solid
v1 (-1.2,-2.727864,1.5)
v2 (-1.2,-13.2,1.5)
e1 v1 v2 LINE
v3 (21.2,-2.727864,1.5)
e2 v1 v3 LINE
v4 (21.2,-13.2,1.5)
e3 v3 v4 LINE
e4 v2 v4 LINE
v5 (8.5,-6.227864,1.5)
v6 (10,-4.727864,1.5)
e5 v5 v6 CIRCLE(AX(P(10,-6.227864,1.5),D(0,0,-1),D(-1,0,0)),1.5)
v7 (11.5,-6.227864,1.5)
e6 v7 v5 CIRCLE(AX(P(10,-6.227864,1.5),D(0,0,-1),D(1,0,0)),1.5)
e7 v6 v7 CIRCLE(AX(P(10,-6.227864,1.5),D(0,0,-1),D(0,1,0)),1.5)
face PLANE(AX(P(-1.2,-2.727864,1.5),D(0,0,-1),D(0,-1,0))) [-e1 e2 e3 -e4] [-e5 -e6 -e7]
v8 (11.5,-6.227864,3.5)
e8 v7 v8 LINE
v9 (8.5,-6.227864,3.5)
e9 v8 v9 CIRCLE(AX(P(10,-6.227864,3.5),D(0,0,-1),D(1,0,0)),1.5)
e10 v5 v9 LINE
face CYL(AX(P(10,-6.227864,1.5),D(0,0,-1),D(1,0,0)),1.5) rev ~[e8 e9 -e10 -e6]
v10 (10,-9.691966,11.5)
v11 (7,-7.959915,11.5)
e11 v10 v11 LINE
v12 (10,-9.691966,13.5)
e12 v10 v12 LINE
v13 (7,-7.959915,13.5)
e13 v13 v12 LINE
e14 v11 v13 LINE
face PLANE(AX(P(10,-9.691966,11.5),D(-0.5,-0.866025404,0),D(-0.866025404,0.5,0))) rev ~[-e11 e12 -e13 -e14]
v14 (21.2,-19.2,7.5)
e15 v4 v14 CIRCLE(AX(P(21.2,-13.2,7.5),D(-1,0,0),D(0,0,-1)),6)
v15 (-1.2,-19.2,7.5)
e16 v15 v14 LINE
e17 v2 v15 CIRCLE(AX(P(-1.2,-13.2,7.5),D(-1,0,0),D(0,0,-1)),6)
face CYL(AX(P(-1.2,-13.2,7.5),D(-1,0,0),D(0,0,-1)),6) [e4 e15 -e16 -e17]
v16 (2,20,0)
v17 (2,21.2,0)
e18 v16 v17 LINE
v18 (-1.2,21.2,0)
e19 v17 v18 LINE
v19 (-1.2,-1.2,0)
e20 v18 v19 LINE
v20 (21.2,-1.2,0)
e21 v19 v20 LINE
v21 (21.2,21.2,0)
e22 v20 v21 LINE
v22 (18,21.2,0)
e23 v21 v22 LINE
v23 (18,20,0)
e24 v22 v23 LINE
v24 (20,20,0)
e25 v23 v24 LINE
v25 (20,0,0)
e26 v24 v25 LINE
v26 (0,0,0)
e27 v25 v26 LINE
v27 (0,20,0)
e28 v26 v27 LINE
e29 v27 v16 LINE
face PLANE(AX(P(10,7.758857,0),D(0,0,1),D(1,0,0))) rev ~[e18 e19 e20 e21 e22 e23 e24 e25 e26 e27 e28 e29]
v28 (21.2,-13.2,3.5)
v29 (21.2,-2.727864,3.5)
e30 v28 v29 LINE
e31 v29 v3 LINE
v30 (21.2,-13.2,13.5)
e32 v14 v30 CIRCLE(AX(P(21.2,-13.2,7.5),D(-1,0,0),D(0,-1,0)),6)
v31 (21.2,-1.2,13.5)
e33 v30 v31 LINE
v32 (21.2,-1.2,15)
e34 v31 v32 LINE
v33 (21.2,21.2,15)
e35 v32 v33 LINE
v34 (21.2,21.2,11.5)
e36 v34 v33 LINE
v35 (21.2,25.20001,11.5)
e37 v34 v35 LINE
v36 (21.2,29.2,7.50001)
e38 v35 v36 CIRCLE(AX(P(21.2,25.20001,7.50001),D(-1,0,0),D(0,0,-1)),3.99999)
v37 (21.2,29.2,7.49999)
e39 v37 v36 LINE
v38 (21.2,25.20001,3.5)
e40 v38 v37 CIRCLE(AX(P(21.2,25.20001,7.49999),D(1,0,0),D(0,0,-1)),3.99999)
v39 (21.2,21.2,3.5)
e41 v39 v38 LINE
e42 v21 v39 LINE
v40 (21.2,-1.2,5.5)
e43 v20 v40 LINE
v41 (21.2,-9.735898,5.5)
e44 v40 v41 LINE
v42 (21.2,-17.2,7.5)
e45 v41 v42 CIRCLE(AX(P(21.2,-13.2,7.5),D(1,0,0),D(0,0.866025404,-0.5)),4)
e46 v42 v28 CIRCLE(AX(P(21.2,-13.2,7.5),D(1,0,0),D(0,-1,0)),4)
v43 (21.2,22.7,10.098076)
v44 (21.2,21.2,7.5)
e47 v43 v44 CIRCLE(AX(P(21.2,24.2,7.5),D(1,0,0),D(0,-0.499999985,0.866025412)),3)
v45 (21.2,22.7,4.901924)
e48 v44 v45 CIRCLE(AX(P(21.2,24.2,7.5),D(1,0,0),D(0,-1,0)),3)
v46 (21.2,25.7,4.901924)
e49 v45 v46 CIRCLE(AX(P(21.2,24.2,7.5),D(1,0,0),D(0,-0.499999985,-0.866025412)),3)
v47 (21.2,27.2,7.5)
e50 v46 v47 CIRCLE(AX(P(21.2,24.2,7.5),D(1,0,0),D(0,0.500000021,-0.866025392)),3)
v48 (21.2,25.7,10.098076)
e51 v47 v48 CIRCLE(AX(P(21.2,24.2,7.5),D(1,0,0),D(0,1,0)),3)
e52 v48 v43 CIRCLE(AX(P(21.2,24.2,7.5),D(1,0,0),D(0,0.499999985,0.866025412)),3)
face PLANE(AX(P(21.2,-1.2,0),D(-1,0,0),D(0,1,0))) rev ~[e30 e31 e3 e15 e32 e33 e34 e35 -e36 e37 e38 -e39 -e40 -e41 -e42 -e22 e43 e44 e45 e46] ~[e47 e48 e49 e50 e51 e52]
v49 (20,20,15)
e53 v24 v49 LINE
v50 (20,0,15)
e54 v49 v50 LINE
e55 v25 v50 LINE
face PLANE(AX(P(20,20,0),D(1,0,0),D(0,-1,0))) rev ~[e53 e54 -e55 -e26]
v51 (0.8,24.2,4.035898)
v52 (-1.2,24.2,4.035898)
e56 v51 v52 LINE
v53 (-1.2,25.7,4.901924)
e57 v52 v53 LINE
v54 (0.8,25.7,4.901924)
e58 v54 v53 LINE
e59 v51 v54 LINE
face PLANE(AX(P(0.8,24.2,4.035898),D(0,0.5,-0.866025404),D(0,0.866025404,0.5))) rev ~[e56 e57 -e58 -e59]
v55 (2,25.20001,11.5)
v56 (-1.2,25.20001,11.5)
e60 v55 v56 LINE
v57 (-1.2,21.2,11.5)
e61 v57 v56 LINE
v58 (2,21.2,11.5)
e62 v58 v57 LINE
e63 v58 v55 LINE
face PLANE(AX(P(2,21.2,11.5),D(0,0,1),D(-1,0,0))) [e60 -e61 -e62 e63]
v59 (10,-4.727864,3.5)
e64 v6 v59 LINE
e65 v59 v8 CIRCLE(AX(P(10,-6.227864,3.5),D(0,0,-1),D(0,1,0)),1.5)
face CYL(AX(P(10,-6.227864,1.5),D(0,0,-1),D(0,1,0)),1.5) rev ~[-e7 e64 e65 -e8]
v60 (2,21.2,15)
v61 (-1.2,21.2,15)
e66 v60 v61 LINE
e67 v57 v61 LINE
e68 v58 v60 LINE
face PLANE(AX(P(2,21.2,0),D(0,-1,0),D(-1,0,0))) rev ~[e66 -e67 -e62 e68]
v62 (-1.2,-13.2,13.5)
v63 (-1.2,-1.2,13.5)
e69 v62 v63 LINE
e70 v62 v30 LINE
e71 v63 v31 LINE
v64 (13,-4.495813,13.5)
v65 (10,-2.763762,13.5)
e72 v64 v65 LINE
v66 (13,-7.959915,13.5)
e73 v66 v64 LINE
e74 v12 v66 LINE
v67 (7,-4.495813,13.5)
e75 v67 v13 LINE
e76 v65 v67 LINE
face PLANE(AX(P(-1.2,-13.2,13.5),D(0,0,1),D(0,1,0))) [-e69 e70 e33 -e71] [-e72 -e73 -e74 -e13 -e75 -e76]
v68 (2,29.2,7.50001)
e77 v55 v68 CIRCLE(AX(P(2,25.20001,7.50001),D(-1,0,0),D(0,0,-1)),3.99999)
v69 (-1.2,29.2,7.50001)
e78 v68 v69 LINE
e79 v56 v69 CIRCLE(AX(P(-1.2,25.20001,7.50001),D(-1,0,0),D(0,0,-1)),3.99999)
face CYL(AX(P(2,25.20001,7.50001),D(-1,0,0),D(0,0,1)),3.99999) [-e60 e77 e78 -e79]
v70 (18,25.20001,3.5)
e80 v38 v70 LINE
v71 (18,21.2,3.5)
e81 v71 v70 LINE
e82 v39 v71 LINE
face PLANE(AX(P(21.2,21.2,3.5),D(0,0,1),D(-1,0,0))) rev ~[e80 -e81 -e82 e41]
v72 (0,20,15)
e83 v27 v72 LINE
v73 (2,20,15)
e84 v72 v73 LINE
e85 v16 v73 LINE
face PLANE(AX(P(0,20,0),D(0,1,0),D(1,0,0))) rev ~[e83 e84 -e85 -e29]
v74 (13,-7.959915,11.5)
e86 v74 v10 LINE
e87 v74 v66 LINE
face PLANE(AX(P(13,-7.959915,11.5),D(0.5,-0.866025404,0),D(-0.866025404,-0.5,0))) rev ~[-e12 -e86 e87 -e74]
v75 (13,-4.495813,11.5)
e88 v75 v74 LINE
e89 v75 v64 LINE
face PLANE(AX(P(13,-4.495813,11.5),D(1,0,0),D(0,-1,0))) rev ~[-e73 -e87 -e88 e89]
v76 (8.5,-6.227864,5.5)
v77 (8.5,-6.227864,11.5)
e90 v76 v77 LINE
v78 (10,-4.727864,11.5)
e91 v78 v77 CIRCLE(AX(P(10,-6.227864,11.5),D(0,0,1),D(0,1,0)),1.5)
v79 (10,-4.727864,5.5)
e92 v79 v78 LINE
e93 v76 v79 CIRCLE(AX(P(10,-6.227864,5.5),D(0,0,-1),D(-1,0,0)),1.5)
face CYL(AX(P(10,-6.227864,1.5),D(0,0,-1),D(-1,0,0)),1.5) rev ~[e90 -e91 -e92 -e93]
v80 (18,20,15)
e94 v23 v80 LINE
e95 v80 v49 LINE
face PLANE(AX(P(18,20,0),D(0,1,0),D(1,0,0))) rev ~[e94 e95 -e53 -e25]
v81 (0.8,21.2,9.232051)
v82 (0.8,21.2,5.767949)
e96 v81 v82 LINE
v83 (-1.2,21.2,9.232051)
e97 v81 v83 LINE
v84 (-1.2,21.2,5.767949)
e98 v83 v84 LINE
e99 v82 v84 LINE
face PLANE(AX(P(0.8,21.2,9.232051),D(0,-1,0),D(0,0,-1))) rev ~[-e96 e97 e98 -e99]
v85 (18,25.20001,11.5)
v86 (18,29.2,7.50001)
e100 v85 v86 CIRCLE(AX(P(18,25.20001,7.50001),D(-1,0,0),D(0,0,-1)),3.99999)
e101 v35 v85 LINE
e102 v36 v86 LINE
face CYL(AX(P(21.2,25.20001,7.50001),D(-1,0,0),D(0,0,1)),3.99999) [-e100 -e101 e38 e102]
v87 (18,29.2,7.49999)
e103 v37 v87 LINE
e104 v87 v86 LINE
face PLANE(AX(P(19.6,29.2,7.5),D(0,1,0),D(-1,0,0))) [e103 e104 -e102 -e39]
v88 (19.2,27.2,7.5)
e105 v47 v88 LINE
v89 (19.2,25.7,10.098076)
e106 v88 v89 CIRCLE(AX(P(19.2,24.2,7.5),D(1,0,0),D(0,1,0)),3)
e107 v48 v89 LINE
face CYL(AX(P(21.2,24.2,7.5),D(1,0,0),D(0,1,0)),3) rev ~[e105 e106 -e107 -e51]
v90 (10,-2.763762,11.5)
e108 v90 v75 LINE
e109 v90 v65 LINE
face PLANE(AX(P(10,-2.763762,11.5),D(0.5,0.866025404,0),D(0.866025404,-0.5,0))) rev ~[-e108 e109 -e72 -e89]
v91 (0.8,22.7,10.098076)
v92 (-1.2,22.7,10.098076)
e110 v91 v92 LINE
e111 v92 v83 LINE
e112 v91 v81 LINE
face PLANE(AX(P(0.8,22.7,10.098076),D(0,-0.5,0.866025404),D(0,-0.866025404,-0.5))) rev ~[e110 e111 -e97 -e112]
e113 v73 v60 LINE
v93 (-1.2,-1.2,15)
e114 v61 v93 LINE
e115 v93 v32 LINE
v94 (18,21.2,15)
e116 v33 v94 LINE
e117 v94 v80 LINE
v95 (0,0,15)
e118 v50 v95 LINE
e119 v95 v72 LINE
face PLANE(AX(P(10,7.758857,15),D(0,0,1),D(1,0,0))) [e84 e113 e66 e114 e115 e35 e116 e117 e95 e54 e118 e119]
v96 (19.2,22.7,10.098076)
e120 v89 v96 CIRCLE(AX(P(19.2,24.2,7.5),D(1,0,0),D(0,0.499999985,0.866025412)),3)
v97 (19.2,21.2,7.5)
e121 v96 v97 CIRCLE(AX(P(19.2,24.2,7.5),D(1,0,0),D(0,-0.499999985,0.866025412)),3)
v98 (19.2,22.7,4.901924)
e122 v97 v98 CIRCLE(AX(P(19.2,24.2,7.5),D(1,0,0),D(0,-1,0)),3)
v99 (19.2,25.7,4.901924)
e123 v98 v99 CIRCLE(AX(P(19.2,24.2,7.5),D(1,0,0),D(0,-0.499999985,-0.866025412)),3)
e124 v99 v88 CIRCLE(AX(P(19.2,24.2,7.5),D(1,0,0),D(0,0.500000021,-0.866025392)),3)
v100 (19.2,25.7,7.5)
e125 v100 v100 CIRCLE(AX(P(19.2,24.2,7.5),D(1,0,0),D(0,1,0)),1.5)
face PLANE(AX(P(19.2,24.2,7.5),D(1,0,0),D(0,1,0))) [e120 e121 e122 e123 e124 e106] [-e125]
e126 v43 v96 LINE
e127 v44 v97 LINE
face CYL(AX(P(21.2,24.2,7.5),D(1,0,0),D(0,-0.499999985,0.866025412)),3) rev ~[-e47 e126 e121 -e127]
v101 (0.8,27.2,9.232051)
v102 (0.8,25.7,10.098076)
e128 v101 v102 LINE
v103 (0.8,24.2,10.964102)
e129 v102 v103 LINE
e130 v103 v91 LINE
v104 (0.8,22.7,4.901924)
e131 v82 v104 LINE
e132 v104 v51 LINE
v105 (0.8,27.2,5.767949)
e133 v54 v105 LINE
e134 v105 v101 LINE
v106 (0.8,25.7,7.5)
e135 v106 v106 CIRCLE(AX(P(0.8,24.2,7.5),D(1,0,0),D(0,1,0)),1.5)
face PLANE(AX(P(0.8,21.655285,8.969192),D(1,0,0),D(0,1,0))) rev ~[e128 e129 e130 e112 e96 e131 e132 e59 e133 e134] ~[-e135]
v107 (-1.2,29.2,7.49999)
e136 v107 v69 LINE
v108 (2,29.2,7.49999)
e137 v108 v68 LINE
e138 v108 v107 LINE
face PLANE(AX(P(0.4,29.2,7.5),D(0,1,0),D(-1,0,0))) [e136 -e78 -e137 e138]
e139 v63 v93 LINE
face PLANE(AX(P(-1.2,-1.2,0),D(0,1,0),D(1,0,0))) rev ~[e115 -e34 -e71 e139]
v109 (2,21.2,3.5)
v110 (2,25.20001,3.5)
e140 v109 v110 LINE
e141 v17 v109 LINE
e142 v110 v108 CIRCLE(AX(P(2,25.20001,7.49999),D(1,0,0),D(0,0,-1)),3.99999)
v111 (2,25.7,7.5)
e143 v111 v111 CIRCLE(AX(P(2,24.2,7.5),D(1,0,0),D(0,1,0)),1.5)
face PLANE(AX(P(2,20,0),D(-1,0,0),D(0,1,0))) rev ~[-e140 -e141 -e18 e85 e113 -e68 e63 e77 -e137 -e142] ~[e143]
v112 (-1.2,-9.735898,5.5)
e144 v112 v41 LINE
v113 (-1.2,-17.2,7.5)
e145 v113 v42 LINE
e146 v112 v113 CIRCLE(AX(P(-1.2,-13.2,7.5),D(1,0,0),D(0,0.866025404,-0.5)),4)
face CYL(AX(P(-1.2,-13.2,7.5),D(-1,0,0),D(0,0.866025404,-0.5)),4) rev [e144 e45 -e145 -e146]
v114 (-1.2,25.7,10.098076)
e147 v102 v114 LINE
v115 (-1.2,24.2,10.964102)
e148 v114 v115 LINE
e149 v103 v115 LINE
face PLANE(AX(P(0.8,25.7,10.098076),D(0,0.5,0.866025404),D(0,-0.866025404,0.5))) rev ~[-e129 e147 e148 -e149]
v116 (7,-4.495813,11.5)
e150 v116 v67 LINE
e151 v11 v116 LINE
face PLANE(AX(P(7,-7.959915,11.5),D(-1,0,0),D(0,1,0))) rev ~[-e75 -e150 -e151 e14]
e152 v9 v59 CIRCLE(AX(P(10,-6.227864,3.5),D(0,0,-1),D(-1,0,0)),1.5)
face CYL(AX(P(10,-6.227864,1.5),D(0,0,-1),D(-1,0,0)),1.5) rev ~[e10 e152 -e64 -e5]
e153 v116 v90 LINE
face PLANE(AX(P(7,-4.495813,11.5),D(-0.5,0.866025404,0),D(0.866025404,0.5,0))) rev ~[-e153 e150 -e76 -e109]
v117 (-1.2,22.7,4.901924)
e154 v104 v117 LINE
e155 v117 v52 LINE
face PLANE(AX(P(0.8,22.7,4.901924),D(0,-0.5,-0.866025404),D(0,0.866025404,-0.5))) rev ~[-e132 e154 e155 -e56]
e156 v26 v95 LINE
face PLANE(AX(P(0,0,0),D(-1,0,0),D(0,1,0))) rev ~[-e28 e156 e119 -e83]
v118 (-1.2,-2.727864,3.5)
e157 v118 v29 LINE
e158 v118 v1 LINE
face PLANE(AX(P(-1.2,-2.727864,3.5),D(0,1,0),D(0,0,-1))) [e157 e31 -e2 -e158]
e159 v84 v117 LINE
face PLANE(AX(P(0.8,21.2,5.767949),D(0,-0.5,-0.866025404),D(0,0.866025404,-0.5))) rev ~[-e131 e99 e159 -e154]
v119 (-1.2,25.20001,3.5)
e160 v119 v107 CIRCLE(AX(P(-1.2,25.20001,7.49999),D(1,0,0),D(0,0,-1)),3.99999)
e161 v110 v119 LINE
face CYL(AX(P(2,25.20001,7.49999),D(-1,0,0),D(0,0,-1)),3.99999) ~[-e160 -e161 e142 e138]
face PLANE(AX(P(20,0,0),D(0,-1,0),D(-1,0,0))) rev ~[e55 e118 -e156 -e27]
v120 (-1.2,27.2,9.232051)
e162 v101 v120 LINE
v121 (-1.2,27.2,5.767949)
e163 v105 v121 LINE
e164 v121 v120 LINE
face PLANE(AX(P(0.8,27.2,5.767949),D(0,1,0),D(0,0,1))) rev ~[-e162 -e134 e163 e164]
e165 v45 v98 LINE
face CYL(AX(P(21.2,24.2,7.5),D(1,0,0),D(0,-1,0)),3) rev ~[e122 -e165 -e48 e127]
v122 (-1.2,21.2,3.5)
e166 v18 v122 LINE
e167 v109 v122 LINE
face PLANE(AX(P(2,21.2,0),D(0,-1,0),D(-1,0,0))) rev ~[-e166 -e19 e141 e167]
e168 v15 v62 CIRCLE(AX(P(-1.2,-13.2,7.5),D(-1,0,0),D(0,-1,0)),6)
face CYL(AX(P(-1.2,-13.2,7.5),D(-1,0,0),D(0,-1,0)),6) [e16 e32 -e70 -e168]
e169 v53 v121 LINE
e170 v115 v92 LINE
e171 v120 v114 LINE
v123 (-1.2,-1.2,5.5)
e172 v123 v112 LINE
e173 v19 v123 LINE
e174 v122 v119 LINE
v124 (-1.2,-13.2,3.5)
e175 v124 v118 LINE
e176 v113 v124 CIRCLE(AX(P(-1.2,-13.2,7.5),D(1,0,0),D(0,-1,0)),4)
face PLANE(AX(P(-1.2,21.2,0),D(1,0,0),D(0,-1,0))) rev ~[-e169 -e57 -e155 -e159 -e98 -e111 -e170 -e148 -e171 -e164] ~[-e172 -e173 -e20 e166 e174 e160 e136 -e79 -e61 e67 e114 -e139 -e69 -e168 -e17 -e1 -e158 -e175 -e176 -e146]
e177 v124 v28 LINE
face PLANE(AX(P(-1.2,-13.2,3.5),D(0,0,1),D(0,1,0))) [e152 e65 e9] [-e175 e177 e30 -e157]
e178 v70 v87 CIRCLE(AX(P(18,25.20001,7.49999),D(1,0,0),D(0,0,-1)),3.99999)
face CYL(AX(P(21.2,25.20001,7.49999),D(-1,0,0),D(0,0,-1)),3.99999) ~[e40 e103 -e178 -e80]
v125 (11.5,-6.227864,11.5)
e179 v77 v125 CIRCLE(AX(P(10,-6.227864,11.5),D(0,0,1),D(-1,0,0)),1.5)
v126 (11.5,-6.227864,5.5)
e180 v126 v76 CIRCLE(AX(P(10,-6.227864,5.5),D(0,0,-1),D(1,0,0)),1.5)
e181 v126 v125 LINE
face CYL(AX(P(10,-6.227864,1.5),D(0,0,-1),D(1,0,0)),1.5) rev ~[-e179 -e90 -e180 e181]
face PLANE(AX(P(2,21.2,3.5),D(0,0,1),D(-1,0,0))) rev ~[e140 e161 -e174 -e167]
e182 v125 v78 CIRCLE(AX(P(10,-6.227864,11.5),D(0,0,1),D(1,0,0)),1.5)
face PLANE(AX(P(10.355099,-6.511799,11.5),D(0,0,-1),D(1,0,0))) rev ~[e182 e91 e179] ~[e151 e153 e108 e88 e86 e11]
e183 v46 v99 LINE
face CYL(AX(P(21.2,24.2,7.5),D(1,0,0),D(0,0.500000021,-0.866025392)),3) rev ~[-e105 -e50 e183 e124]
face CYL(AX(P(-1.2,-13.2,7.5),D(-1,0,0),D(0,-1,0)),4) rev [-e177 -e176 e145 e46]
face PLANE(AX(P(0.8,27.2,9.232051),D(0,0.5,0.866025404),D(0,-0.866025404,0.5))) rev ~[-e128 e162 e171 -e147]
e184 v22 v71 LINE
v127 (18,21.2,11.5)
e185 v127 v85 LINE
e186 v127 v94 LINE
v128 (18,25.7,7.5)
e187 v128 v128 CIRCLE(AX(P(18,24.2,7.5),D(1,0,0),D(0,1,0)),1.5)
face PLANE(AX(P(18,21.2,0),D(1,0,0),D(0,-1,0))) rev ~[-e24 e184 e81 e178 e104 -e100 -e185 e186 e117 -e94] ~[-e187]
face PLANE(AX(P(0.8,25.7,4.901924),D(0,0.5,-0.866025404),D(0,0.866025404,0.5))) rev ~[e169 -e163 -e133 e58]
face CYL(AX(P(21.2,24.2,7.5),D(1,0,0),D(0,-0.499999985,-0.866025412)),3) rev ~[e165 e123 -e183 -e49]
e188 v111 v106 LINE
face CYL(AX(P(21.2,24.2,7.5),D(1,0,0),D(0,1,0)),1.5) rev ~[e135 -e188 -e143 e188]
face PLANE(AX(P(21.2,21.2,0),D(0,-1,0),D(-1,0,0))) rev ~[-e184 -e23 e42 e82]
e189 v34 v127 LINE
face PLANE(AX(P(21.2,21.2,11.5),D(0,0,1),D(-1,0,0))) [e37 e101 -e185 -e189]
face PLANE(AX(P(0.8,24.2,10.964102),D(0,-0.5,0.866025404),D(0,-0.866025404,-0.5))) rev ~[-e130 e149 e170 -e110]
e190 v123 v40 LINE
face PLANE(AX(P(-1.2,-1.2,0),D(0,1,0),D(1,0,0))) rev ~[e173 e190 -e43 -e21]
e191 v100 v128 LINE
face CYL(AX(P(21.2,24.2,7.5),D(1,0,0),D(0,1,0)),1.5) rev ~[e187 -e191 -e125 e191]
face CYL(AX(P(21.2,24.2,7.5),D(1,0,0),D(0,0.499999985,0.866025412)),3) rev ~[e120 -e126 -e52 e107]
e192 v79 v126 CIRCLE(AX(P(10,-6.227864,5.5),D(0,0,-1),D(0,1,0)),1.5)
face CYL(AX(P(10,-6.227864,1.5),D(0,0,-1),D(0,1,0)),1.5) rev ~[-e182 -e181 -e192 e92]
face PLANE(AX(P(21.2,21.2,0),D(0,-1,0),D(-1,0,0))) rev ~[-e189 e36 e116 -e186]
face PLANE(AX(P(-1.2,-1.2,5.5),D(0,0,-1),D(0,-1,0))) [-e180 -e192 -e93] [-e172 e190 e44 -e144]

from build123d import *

# Parameters (mm, degrees)
F1_DEPTH  = 15
F3_DEPTH  = 22.4
F5_DEPTH  = 25
F6_START  = -10
F6_DEPTH  = 15
F7_W      = 3.2
F7_H      = 8
F8_DEPTH  = 8
F9_R      = 3.99999
F10_R     = 1.5
F11_DEPTH = 25
F12_DEPTH = 2
F13_START = -20.4
F13_DEPTH = 4.6


# Not quite as in the source:
# - a fillet or chamfer is up to 0.001 mm smaller than in the source, because OpenCascade refuses the exact size


with BuildPart() as f1:
    # F0 (on Top) → F1 (new body)
    with BuildSketch(Plane.XY):
        Polygon((20, 0), (0, 0), (0, 20), (2, 20), (2, 21.2), (-1.2, 21.2), (-1.2, -1.2), (21.2, -1.2), (21.2, 21.2), (18, 21.2), (18, 20), (20, 20), align=None)
    extrude(amount=F1_DEPTH)

    # F2 (on face) → F3 (join)
    with BuildSketch(Plane(origin=(-1.2, 0, 0), x_dir=(0, -1, 0), z_dir=(-1, 0, 0))):
        with BuildLine():
            Line((1.2, 5.5), (7.5431457505, 5.5))
            ThreePointArc((7.5431457505, 5.5), (8.3010205144, 10.9641016151), (13.2, 13.5))
            Line((13.2, 13.5), (1.2, 13.5))
            Line((1.2, 13.5), (1.2, 5.5))
        make_face()
        with BuildLine():
            ThreePointArc((17.2, 7.5), (16.0284271247, 4.6715728753), (13.2, 3.5))
            Line((13.2, 3.5), (8.727864045, 3.5))
            ThreePointArc((8.727864045, 3.5), (10.7505102572, 2.0227744249), (13.2, 1.5))
            ThreePointArc((13.2, 1.5), (17.4426406871, 3.2573593129), (19.2, 7.5))
            ThreePointArc((19.2, 7.5), (17.4426406871, 11.7426406871), (13.2, 13.5))
            ThreePointArc((13.2, 13.5), (8.3010205144, 10.9641016151), (7.5431457505, 5.5))
            Line((7.5431457505, 5.5), (9.7358983849, 5.5))
            ThreePointArc((9.7358983849, 5.5), (12.1647238196, 11.3637033052), (17.2, 7.5))
        make_face()
        with BuildLine():
            ThreePointArc((13.2, 1.5), (10.7505102572, 2.0227744249), (8.727864045, 3.5))
            Line((8.727864045, 3.5), (2.727864045, 3.5))
            Line((2.727864045, 3.5), (2.727864045, 1.5))
            Line((2.727864045, 1.5), (13.2, 1.5))
        make_face()
    extrude(amount=-F3_DEPTH)

    # F4 (on face) → F5 (cut)
    with BuildSketch(Plane(origin=(0, 0, 1.5), x_dir=(1, 0, 0), z_dir=(0, 0, -1))):
        with BuildLine():
            ThreePointArc((8.5, 6.227864045), (8.9393398282, 5.1672038732), (10, 4.727864045))
            Line((10, 4.727864045), (10, 6.227864045))
            Line((10, 6.227864045), (8.5, 6.227864045))
        make_face()
        with BuildLine():
            Line((10, 6.227864045), (10, 4.727864045))
            ThreePointArc((10, 4.727864045), (11.0606601718, 5.1672038732), (11.5, 6.227864045))
            ThreePointArc((11.5, 6.227864045), (10, 7.727864045), (8.5, 6.227864045))
            Line((8.5, 6.227864045), (10, 6.227864045))
        make_face()
    extrude(amount=-F5_DEPTH, mode=Mode.SUBTRACT)

    # F4 (on face) → F6 (cut)
    with BuildSketch(Plane(origin=(0, 0, 1.5), x_dir=(1, 0, 0), z_dir=(0, 0, -1)).offset(F6_START)):
        with BuildLine():
            Line((10, 4.727864045), (10, 2.7637624299))
            Line((10, 2.7637624299), (13, 4.4958132374))
            Line((13, 4.4958132374), (13, 7.9599148526))
            Line((13, 7.9599148526), (10, 9.6919656601))
            Line((10, 9.6919656601), (7, 7.9599148526))
            Line((7, 7.9599148526), (7, 6.227864045))
            Line((7, 6.227864045), (8.5, 6.227864045))
            ThreePointArc((8.5, 6.227864045), (10, 7.727864045), (11.5, 6.227864045))
            ThreePointArc((11.5, 6.227864045), (11.0606601718, 5.1672038732), (10, 4.727864045))
        make_face()
        with BuildLine():
            Line((7, 4.4958132374), (10, 2.7637624299))
            Line((10, 2.7637624299), (10, 4.727864045))
            ThreePointArc((10, 4.727864045), (8.9393398282, 5.1672038732), (8.5, 6.227864045))
            Line((8.5, 6.227864045), (7, 6.227864045))
            Line((7, 6.227864045), (7, 4.4958132374))
        make_face()
    extrude(amount=-F6_DEPTH, mode=Mode.SUBTRACT)

    # F7 (on face) → F8 (join)
    with BuildSketch(Plane(origin=(0, 21.2, 0), x_dir=(-1, 0, 0), z_dir=(0, 1, 0))):
        with Locations((-19.6, 7.5)):
            Rectangle(F7_W, F7_H)
        with Locations((-0.4, 7.5)):
            Rectangle(F7_W, F7_H)
    extrude(amount=F8_DEPTH)

    # F9 (radius 4 in the source; OpenCascade refuses exactly that, so slightly less here)
    f9_edges = [f1.edges().sort_by_distance(p)[0] for p in [
        (19.6, 29.2, 11.5),
        (19.6, 29.2, 3.5),
        (0.4, 29.2, 11.5),
        (0.4, 29.2, 3.5),
    ]]
    fillet(f9_edges, radius=F9_R)

    # F10 (on face) → F11 (cut)
    with BuildSketch(Plane.YZ.offset(21.2)):
        with Locations((24.2, 7.5)):
            Circle(F10_R)
    extrude(amount=-F11_DEPTH, mode=Mode.SUBTRACT)

    # F10 (on face) → F12 (cut)
    with BuildSketch(Plane.YZ.offset(21.2)):
        with BuildLine():
            ThreePointArc((25.7000000635, 4.9019238253), (26.7980762297, 6.0000000317), (27.2, 7.5))
            ThreePointArc((27.2, 7.5), (26.7980761988, 9.0000000218), (25.6999999564, 10.0980762365))
            ThreePointArc((25.6999999564, 10.0980762365), (24.2, 10.5), (22.7000000436, 10.0980762365))
            ThreePointArc((22.7000000436, 10.0980762365), (21.6019238012, 9.0000000218), (21.2, 7.5))
            ThreePointArc((21.2, 7.5), (21.6019238012, 5.9999999782), (22.7000000436, 4.9019237635))
            ThreePointArc((22.7000000436, 4.9019237635), (24.2000000618, 4.5), (25.7000000635, 4.9019238253))
        make_face()
        with Locations((24.2, 7.5)):
            Circle(F10_R, mode=Mode.SUBTRACT)
    extrude(amount=-F12_DEPTH, mode=Mode.SUBTRACT)

    # F10 (on face) → F13 (cut)
    with BuildSketch(Plane.YZ.offset(21.2).offset(F13_START)):
        with BuildLine():
            ThreePointArc((21.2, 7.5), (21.6019238012, 9.0000000218), (22.7000000436, 10.0980762365))
            Line((22.7000000436, 10.0980762365), (21.2, 9.2320508076))
            Line((21.2, 9.2320508076), (21.2, 7.5))
        make_face()
        with BuildLine():
            ThreePointArc((22.7000000436, 10.0980762365), (24.2, 10.5), (25.6999999564, 10.0980762365))
            Line((25.6999999564, 10.0980762365), (24.2, 10.9641016151))
            Line((24.2, 10.9641016151), (22.7000000436, 10.0980762365))
        make_face()
        with BuildLine():
            ThreePointArc((25.6999999564, 10.0980762365), (26.7980761988, 9.0000000218), (27.2, 7.5))
            Line((27.2, 7.5), (27.2, 9.2320508076))
            Line((27.2, 9.2320508076), (25.6999999564, 10.0980762365))
        make_face()
        with BuildLine():
            ThreePointArc((25.7000000635, 4.9019238253), (26.7980762297, 6.0000000317), (27.2, 7.5))
            ThreePointArc((27.2, 7.5), (26.7980761988, 9.0000000218), (25.6999999564, 10.0980762365))
            ThreePointArc((25.6999999564, 10.0980762365), (24.2, 10.5), (22.7000000436, 10.0980762365))
            ThreePointArc((22.7000000436, 10.0980762365), (21.6019238012, 9.0000000218), (21.2, 7.5))
            ThreePointArc((21.2, 7.5), (21.6019238012, 5.9999999782), (22.7000000436, 4.9019237635))
            ThreePointArc((22.7000000436, 4.9019237635), (24.2000000618, 4.5), (25.7000000635, 4.9019238253))
        make_face()
        with Locations((24.2, 7.5)):
            Circle(F10_R, mode=Mode.SUBTRACT)
        with BuildLine():
            Line((24.2, 4.0358983849), (25.7000000635, 4.9019238253))
            ThreePointArc((25.7000000635, 4.9019238253), (24.2000000618, 4.5), (22.7000000436, 4.9019237635))
            Line((22.7000000436, 4.9019237635), (24.2, 4.0358983849))
        make_face()
        with BuildLine():
            Line((21.2, 5.7679491924), (22.7000000436, 4.9019237635))
            ThreePointArc((22.7000000436, 4.9019237635), (21.6019238012, 5.9999999782), (21.2, 7.5))
            Line((21.2, 7.5), (21.2, 5.7679491924))
        make_face()
        with BuildLine():
            Line((27.2, 5.7679491924), (27.2, 7.5))
            ThreePointArc((27.2, 7.5), (26.7980762297, 6.0000000317), (25.7000000635, 4.9019238253))
            Line((25.7000000635, 4.9019238253), (27.2, 5.7679491924))
        make_face()
    extrude(amount=-F13_DEPTH, mode=Mode.SUBTRACT)


solid = f1.part
